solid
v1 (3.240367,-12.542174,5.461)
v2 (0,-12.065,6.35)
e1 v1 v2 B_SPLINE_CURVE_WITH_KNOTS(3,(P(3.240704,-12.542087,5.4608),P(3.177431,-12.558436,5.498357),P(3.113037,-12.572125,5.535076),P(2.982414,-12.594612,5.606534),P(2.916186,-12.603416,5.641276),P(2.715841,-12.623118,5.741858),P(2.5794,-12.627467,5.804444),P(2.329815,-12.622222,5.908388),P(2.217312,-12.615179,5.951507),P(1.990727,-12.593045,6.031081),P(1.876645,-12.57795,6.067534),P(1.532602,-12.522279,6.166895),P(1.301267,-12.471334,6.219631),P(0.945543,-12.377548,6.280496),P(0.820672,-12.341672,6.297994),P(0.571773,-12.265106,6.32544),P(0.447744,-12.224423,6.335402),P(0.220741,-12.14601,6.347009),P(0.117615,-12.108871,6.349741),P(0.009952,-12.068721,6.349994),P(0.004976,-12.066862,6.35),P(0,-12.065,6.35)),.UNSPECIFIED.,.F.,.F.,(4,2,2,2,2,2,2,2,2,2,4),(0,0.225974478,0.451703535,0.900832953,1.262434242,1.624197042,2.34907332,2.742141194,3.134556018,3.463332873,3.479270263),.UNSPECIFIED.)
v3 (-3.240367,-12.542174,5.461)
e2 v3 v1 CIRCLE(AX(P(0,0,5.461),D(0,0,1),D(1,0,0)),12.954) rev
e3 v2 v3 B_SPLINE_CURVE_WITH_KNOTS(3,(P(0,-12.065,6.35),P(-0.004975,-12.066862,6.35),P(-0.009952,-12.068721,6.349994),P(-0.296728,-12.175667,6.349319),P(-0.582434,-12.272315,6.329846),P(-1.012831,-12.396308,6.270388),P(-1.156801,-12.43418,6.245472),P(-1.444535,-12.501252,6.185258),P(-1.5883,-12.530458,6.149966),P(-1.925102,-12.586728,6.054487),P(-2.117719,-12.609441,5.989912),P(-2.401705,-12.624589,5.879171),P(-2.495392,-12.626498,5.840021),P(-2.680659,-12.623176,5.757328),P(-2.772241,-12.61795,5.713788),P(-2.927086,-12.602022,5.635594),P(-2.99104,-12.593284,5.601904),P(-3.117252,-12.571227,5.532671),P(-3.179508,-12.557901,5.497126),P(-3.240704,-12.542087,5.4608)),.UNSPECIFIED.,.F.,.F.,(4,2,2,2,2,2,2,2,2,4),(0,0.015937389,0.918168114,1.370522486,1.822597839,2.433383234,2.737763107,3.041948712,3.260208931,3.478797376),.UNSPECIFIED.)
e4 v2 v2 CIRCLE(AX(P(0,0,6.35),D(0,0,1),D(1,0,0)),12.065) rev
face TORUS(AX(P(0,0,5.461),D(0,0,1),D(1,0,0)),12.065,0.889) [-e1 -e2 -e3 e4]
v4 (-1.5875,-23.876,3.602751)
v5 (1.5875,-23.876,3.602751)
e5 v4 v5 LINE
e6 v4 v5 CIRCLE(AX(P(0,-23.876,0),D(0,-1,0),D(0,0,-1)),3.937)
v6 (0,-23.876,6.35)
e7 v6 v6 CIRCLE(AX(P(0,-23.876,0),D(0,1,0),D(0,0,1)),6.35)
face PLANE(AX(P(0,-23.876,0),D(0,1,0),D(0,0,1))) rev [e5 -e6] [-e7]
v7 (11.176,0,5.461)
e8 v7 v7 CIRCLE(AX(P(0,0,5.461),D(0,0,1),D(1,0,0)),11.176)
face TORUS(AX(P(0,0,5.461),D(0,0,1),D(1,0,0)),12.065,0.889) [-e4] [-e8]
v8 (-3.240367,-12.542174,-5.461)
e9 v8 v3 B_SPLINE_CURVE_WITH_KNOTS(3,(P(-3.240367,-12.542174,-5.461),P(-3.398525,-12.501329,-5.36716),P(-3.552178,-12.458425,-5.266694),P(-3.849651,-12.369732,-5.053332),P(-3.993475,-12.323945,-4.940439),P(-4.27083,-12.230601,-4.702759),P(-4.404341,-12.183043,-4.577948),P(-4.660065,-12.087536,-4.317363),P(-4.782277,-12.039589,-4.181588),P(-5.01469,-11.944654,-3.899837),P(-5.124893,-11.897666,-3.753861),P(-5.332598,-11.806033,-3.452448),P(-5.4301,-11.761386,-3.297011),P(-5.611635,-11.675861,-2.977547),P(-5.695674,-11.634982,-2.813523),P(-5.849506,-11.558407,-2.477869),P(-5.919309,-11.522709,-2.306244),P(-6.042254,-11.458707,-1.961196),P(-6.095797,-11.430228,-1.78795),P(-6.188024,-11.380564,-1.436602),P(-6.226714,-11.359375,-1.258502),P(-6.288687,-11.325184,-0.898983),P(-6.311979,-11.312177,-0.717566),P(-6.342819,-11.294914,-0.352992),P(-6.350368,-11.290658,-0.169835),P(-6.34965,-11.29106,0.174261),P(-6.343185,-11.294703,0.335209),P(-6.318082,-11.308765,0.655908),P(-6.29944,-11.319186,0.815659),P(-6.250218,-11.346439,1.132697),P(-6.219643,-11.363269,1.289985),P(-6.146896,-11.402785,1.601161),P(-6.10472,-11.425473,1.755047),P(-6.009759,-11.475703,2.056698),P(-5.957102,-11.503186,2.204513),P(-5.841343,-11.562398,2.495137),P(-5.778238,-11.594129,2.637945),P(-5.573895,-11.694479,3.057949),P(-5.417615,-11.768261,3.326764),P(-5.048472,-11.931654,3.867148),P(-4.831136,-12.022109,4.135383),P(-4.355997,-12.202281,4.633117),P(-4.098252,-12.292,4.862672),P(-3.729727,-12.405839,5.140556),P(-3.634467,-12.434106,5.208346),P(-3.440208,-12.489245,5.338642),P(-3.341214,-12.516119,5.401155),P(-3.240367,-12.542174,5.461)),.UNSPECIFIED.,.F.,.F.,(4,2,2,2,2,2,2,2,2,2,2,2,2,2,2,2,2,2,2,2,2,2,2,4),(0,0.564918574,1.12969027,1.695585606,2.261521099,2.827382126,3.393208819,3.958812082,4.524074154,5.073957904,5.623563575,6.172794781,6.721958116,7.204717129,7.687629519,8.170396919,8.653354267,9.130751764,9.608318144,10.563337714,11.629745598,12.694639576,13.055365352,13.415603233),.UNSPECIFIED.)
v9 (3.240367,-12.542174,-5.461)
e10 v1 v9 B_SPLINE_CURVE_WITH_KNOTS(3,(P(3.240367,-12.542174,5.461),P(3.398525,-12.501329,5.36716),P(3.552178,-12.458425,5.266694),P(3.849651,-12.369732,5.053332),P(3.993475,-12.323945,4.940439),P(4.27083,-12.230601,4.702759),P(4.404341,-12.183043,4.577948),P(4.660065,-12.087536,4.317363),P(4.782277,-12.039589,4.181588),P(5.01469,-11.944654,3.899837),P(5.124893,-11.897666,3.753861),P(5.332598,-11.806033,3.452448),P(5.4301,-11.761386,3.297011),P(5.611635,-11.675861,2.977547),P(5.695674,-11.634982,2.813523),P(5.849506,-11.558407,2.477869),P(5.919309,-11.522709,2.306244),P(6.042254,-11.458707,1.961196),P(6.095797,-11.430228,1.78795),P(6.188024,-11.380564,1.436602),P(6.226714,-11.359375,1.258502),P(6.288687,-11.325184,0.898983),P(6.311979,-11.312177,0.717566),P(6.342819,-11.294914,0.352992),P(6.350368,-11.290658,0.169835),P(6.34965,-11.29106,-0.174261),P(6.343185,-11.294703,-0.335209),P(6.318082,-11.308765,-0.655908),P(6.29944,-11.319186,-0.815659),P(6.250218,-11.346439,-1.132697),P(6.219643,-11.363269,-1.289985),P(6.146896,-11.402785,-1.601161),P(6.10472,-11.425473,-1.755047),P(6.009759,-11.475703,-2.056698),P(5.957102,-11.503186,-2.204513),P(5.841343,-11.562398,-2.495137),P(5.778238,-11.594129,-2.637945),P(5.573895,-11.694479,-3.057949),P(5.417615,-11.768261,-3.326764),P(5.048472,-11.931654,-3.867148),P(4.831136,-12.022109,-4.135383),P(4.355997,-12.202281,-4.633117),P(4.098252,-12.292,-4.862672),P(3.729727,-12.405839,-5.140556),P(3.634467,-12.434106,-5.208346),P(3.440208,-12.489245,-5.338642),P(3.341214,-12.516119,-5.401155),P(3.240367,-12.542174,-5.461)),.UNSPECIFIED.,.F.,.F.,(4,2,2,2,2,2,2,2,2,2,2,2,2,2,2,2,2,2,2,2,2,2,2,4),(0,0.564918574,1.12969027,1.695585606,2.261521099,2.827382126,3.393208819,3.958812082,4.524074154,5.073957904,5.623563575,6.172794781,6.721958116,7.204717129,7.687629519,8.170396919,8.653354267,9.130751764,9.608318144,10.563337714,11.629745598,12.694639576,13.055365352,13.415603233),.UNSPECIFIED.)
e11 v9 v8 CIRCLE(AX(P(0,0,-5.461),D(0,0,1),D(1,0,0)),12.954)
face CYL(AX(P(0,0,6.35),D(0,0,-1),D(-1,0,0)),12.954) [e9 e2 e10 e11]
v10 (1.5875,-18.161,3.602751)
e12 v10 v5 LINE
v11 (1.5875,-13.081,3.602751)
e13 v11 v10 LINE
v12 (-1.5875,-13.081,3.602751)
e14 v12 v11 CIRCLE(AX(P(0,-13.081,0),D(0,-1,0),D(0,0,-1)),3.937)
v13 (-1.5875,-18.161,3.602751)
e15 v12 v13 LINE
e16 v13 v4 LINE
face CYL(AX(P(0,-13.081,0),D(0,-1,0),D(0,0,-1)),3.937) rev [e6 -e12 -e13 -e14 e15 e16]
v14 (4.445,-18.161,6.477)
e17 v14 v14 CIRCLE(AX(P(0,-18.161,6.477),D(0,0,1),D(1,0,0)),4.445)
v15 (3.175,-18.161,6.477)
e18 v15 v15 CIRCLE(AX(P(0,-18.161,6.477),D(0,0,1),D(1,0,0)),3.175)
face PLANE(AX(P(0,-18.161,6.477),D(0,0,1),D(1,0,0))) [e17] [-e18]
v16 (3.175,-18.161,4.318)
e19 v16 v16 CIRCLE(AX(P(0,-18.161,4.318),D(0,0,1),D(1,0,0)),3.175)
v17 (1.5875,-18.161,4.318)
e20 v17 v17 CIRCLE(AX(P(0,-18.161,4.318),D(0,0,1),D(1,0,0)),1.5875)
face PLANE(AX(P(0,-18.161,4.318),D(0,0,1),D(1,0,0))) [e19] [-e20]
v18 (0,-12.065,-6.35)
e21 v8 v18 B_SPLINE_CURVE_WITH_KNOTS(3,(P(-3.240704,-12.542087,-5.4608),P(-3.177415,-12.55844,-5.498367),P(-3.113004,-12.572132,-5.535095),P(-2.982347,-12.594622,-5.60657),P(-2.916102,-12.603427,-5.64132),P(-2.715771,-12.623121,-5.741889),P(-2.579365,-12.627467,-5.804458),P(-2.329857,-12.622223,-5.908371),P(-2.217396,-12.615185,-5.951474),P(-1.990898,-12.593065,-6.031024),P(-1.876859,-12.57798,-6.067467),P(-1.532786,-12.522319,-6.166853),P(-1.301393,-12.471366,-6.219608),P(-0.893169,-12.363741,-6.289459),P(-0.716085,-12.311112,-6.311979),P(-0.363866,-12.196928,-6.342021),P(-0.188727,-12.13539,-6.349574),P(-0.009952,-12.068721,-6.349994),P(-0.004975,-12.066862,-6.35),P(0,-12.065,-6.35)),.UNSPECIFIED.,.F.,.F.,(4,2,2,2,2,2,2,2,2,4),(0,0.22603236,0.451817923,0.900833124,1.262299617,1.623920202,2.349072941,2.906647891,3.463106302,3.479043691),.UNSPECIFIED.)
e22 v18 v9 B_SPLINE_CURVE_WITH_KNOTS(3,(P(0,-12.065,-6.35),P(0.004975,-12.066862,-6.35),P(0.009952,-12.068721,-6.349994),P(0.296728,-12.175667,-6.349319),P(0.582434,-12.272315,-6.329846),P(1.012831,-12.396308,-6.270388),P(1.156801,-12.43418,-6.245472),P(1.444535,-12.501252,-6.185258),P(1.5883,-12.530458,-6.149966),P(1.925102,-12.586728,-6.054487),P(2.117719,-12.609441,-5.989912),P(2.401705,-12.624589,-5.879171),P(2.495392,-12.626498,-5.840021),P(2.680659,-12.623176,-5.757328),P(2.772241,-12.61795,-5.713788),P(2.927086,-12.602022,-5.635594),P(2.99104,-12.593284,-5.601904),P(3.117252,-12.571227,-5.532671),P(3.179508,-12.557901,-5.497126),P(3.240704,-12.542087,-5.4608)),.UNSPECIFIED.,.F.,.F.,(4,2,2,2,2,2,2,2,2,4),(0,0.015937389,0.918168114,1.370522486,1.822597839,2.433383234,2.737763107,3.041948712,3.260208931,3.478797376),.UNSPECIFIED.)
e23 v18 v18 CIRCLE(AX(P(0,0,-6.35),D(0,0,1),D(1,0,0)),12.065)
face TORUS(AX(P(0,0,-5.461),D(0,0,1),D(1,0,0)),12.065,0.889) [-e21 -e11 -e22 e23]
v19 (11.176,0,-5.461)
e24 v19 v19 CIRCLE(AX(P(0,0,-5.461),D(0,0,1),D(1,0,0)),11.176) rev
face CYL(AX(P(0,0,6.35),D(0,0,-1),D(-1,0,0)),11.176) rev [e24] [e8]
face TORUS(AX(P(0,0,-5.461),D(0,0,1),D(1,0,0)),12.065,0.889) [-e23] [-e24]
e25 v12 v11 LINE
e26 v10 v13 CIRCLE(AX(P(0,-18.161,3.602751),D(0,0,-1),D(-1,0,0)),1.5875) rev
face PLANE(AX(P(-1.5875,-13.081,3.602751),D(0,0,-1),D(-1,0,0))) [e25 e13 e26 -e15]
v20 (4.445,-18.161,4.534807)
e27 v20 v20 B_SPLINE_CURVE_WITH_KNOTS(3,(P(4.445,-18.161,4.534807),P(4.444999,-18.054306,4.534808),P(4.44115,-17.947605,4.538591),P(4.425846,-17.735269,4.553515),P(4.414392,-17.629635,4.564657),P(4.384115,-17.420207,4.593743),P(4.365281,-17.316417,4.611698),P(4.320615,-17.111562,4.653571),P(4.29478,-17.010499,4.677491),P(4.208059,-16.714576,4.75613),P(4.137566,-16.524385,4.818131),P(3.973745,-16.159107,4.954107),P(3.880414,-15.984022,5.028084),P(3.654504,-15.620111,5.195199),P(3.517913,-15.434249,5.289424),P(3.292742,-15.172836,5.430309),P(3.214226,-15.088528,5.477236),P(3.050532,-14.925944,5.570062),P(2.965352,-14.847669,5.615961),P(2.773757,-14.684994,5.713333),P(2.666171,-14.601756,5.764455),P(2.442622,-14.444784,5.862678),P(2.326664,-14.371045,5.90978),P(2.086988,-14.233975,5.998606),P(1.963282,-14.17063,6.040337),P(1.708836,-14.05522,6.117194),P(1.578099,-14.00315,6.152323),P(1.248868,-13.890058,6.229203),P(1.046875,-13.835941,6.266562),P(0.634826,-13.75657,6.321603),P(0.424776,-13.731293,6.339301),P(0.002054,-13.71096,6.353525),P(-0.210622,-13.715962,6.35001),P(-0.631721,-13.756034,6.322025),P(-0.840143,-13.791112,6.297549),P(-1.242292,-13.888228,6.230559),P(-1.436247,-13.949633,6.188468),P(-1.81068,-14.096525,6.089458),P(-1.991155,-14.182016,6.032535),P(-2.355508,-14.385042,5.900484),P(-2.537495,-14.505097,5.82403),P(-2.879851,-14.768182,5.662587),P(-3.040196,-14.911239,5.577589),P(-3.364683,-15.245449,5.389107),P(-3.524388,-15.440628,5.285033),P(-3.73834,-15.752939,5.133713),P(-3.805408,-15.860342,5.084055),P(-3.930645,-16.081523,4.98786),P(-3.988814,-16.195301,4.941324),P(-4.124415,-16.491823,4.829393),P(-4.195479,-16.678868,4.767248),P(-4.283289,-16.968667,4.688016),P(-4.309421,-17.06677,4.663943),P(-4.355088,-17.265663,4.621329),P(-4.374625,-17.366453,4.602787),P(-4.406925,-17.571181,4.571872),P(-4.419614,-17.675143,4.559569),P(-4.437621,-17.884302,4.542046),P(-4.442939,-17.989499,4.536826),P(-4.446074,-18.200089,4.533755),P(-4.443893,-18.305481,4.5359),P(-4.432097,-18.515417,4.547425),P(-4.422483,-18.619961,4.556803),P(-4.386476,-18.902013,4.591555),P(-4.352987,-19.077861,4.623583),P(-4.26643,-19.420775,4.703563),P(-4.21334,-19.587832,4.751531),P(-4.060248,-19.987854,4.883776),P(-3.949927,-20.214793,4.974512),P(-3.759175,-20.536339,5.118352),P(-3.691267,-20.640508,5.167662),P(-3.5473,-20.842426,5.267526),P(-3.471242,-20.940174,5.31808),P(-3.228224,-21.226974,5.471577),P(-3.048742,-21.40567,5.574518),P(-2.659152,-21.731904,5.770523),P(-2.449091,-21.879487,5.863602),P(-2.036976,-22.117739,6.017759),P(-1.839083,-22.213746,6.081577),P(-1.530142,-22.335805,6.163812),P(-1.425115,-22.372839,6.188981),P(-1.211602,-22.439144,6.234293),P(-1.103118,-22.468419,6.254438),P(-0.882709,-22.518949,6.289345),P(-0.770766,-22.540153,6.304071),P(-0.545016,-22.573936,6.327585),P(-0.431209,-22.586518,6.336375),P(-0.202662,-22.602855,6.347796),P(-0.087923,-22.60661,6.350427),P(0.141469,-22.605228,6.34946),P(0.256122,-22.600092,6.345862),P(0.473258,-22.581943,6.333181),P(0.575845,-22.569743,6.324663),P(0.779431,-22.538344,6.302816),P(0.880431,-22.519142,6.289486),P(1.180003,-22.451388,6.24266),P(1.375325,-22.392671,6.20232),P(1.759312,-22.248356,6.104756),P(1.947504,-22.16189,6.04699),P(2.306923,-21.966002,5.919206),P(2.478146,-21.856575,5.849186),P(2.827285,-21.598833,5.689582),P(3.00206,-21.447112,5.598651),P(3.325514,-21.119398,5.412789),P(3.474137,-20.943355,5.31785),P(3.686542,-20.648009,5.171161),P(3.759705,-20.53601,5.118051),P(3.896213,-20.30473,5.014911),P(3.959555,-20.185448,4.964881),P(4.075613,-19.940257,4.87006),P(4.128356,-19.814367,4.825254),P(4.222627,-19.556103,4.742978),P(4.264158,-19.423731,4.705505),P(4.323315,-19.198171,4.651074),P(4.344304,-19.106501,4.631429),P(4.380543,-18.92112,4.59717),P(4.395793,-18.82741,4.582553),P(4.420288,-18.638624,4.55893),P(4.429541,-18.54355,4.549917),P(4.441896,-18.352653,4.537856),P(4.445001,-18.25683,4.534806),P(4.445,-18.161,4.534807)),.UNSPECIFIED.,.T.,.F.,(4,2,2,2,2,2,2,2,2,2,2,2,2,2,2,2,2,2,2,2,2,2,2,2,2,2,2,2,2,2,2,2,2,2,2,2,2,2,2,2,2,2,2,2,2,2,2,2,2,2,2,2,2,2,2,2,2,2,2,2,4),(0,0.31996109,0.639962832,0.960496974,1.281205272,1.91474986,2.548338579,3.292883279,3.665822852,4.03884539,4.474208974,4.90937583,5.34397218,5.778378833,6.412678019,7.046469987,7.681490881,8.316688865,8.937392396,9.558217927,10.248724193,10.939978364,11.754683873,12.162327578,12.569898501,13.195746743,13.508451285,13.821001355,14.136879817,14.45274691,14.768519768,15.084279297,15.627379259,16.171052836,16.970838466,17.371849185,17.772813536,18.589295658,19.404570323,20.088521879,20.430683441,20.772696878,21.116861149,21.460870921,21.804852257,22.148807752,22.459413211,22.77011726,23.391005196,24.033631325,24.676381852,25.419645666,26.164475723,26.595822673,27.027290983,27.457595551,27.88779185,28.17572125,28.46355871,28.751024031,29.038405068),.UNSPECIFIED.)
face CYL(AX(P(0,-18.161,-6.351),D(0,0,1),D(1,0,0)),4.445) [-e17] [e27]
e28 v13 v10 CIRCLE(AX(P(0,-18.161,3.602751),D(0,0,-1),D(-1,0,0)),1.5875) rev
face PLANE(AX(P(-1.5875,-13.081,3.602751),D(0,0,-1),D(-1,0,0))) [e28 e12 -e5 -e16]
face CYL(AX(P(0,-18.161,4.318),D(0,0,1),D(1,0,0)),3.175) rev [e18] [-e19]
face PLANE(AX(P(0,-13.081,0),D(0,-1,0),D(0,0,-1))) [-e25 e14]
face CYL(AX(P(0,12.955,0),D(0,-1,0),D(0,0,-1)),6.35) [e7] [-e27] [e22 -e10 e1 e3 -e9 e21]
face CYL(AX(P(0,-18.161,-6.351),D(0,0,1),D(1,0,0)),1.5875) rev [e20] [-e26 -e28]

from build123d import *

# Parameters (mm, degrees)
SKETCH1_R           = 11.176
BASE_EXTRUDE_DEPTH  = 6.35
SHELL1_T            = 1.778
FILLET1_R           = 0.889
BOSS_EXTRUDE1_REACH = 41.555
SKETCH2_R           = 6.35
CUT_EXTRUDE1_DEPTH  = 10.795
BOSS_EXTRUDE2_REACH = 37.383
SKETCH4_R           = 4.445
SKETCH5_R           = 3.175
CUT_EXTRUDE2_DEPTH  = 2.159
CUT_EXTRUDE3_REACH  = 31.183
SKETCH6_R           = 1.5875


with BuildPart() as part:
    # Sketch1 → Base-Extrude (new, symmetric)
    with BuildSketch(Plane.XY):
        Circle(SKETCH1_R)
    extrude(amount=BASE_EXTRUDE_DEPTH, both=True)

    # Shell1
    shell1_openings = [part.faces().sort_by_distance(p)[0] for p in [
        (0, 0, 6.35),
        (0, 0, -6.35),
    ]]
    offset(amount=SHELL1_T, openings=shell1_openings, kind=Kind.INTERSECTION)

    # Fillet1
    # the kernel refuses this fillet: 0.889 mm, written as the material it takes off along each edge
    with BuildSketch(Plane(origin=(0, 0, -6.35), x_dir=(1, 0, 0), z_dir=(0, -1, 0))) as fillet1_piece_1:
        with BuildLine():
            CenterArc((12.954 - FILLET1_R, FILLET1_R), FILLET1_R, 270, 90)
            Line((12.954 - FILLET1_R, 0), (12.954, 0))
            Line((12.954, 0), (12.954, FILLET1_R))
        make_face()
    revolve(axis=Axis((0, 0, -6.35), (0, 0, 1)), mode=Mode.SUBTRACT)
    with BuildSketch(Plane(origin=(0, 0, 6.35), x_dir=(1, 0, 0), z_dir=(0, -1, 0))) as fillet1_piece_2:
        with BuildLine():
            CenterArc((12.954 - FILLET1_R, -FILLET1_R), FILLET1_R, 0, 90)
            Line((12.954, -FILLET1_R), (12.954, 0))
            Line((12.954, 0), (12.954 - FILLET1_R, 0))
        make_face()
    revolve(axis=Axis((0, 0, 6.35), (0, 0, 1)), mode=Mode.SUBTRACT)
    with BuildSketch(Plane(origin=(0, 0, -6.35), x_dir=(1, 0, 0), z_dir=(0, -1, 0))) as fillet1_piece_3:
        with BuildLine():
            CenterArc((11.176 + FILLET1_R, FILLET1_R), FILLET1_R, 180, 90)
            Line((11.176 + FILLET1_R, 0), (11.176, 0))
            Line((11.176, 0), (11.176, FILLET1_R))
        make_face()
    revolve(axis=Axis((0, 0, -6.35), (0, 0, 1)), mode=Mode.SUBTRACT)
    with BuildSketch(Plane(origin=(0, 0, 6.35), x_dir=(1, 0, 0), z_dir=(0, -1, 0))) as fillet1_piece_4:
        with BuildLine():
            CenterArc((11.176 + FILLET1_R, -FILLET1_R), FILLET1_R, 90, 90)
            Line((11.176 + FILLET1_R, 0), (11.176, 0))
            Line((11.176, 0), (11.176, -FILLET1_R))
        make_face()
    revolve(axis=Axis((0, 0, 6.35), (0, 0, 1)), mode=Mode.SUBTRACT)

    # Sketch2 → Boss-Extrude1 (add, up to next)
    with BuildSketch(Plane(origin=(0, -23.876, 0), x_dir=(-1, 0, 0), z_dir=(0, 1, 0)), mode=Mode.PRIVATE) as boss_extrude1_sk1:
        with Locations(Location((0, 0, 0), (0, 0, 90))):
            Circle(SKETCH2_R)
    boss_extrude1_tool1 = extrude(boss_extrude1_sk1.sketch, amount=BOSS_EXTRUDE1_REACH, mode=Mode.PRIVATE) - part.part
    add(boss_extrude1_tool1.solids().sort_by_distance((0, -23.876, 0))[0])

    # Sketch3 → Cut-Extrude1 (cut)
    with BuildSketch(Plane.XZ.offset(23.876)):
        with BuildLine():
            Line((-1.5875, 3.60275072), (1.5875, 3.60275072))
            ThreePointArc((1.5875, 3.60275072), (0, -3.937), (-1.5875, 3.60275072))
        make_face()
    extrude(amount=-CUT_EXTRUDE1_DEPTH, mode=Mode.SUBTRACT)

    # Sketch4 → Boss-Extrude2 (add, up to next)
    with BuildSketch(Plane(origin=(0, -17.371432399, 6.477), x_dir=(-1, 0, 0), z_dir=(0, 0, 1)), mode=Mode.PRIVATE) as boss_extrude2_sk1:
        with Locations(Location((0, 0.789567601, 0), (0, 0, 180))):
            Circle(SKETCH4_R)
    boss_extrude2_tool1 = extrude(boss_extrude2_sk1.sketch, amount=-BOSS_EXTRUDE2_REACH, mode=Mode.PRIVATE) - part.part
    add(boss_extrude2_tool1.solids().sort_by_distance((0, -18.161, 6.477))[0])

    # Sketch5 → Cut-Extrude2 (cut)
    with BuildSketch(Plane.XY.offset(6.477)):
        with Locations((0, -18.161)):
            Circle(SKETCH5_R)
    extrude(amount=-CUT_EXTRUDE2_DEPTH, mode=Mode.SUBTRACT)

    # Sketch6 → Cut-Extrude3 (cut, up to next)
    with BuildSketch(Plane.XY.offset(4.318), mode=Mode.PRIVATE) as cut_extrude3_sk1:
        with Locations((0, -18.161)):
            Circle(SKETCH6_R)
    cut_extrude3_tool1 = extrude(cut_extrude3_sk1.sketch, amount=-CUT_EXTRUDE3_REACH, mode=Mode.PRIVATE) & part.part
    add(cut_extrude3_tool1.solids().sort_by_distance((0, -18.161, 4.318))[0], mode=Mode.SUBTRACT)


solid = part.part
